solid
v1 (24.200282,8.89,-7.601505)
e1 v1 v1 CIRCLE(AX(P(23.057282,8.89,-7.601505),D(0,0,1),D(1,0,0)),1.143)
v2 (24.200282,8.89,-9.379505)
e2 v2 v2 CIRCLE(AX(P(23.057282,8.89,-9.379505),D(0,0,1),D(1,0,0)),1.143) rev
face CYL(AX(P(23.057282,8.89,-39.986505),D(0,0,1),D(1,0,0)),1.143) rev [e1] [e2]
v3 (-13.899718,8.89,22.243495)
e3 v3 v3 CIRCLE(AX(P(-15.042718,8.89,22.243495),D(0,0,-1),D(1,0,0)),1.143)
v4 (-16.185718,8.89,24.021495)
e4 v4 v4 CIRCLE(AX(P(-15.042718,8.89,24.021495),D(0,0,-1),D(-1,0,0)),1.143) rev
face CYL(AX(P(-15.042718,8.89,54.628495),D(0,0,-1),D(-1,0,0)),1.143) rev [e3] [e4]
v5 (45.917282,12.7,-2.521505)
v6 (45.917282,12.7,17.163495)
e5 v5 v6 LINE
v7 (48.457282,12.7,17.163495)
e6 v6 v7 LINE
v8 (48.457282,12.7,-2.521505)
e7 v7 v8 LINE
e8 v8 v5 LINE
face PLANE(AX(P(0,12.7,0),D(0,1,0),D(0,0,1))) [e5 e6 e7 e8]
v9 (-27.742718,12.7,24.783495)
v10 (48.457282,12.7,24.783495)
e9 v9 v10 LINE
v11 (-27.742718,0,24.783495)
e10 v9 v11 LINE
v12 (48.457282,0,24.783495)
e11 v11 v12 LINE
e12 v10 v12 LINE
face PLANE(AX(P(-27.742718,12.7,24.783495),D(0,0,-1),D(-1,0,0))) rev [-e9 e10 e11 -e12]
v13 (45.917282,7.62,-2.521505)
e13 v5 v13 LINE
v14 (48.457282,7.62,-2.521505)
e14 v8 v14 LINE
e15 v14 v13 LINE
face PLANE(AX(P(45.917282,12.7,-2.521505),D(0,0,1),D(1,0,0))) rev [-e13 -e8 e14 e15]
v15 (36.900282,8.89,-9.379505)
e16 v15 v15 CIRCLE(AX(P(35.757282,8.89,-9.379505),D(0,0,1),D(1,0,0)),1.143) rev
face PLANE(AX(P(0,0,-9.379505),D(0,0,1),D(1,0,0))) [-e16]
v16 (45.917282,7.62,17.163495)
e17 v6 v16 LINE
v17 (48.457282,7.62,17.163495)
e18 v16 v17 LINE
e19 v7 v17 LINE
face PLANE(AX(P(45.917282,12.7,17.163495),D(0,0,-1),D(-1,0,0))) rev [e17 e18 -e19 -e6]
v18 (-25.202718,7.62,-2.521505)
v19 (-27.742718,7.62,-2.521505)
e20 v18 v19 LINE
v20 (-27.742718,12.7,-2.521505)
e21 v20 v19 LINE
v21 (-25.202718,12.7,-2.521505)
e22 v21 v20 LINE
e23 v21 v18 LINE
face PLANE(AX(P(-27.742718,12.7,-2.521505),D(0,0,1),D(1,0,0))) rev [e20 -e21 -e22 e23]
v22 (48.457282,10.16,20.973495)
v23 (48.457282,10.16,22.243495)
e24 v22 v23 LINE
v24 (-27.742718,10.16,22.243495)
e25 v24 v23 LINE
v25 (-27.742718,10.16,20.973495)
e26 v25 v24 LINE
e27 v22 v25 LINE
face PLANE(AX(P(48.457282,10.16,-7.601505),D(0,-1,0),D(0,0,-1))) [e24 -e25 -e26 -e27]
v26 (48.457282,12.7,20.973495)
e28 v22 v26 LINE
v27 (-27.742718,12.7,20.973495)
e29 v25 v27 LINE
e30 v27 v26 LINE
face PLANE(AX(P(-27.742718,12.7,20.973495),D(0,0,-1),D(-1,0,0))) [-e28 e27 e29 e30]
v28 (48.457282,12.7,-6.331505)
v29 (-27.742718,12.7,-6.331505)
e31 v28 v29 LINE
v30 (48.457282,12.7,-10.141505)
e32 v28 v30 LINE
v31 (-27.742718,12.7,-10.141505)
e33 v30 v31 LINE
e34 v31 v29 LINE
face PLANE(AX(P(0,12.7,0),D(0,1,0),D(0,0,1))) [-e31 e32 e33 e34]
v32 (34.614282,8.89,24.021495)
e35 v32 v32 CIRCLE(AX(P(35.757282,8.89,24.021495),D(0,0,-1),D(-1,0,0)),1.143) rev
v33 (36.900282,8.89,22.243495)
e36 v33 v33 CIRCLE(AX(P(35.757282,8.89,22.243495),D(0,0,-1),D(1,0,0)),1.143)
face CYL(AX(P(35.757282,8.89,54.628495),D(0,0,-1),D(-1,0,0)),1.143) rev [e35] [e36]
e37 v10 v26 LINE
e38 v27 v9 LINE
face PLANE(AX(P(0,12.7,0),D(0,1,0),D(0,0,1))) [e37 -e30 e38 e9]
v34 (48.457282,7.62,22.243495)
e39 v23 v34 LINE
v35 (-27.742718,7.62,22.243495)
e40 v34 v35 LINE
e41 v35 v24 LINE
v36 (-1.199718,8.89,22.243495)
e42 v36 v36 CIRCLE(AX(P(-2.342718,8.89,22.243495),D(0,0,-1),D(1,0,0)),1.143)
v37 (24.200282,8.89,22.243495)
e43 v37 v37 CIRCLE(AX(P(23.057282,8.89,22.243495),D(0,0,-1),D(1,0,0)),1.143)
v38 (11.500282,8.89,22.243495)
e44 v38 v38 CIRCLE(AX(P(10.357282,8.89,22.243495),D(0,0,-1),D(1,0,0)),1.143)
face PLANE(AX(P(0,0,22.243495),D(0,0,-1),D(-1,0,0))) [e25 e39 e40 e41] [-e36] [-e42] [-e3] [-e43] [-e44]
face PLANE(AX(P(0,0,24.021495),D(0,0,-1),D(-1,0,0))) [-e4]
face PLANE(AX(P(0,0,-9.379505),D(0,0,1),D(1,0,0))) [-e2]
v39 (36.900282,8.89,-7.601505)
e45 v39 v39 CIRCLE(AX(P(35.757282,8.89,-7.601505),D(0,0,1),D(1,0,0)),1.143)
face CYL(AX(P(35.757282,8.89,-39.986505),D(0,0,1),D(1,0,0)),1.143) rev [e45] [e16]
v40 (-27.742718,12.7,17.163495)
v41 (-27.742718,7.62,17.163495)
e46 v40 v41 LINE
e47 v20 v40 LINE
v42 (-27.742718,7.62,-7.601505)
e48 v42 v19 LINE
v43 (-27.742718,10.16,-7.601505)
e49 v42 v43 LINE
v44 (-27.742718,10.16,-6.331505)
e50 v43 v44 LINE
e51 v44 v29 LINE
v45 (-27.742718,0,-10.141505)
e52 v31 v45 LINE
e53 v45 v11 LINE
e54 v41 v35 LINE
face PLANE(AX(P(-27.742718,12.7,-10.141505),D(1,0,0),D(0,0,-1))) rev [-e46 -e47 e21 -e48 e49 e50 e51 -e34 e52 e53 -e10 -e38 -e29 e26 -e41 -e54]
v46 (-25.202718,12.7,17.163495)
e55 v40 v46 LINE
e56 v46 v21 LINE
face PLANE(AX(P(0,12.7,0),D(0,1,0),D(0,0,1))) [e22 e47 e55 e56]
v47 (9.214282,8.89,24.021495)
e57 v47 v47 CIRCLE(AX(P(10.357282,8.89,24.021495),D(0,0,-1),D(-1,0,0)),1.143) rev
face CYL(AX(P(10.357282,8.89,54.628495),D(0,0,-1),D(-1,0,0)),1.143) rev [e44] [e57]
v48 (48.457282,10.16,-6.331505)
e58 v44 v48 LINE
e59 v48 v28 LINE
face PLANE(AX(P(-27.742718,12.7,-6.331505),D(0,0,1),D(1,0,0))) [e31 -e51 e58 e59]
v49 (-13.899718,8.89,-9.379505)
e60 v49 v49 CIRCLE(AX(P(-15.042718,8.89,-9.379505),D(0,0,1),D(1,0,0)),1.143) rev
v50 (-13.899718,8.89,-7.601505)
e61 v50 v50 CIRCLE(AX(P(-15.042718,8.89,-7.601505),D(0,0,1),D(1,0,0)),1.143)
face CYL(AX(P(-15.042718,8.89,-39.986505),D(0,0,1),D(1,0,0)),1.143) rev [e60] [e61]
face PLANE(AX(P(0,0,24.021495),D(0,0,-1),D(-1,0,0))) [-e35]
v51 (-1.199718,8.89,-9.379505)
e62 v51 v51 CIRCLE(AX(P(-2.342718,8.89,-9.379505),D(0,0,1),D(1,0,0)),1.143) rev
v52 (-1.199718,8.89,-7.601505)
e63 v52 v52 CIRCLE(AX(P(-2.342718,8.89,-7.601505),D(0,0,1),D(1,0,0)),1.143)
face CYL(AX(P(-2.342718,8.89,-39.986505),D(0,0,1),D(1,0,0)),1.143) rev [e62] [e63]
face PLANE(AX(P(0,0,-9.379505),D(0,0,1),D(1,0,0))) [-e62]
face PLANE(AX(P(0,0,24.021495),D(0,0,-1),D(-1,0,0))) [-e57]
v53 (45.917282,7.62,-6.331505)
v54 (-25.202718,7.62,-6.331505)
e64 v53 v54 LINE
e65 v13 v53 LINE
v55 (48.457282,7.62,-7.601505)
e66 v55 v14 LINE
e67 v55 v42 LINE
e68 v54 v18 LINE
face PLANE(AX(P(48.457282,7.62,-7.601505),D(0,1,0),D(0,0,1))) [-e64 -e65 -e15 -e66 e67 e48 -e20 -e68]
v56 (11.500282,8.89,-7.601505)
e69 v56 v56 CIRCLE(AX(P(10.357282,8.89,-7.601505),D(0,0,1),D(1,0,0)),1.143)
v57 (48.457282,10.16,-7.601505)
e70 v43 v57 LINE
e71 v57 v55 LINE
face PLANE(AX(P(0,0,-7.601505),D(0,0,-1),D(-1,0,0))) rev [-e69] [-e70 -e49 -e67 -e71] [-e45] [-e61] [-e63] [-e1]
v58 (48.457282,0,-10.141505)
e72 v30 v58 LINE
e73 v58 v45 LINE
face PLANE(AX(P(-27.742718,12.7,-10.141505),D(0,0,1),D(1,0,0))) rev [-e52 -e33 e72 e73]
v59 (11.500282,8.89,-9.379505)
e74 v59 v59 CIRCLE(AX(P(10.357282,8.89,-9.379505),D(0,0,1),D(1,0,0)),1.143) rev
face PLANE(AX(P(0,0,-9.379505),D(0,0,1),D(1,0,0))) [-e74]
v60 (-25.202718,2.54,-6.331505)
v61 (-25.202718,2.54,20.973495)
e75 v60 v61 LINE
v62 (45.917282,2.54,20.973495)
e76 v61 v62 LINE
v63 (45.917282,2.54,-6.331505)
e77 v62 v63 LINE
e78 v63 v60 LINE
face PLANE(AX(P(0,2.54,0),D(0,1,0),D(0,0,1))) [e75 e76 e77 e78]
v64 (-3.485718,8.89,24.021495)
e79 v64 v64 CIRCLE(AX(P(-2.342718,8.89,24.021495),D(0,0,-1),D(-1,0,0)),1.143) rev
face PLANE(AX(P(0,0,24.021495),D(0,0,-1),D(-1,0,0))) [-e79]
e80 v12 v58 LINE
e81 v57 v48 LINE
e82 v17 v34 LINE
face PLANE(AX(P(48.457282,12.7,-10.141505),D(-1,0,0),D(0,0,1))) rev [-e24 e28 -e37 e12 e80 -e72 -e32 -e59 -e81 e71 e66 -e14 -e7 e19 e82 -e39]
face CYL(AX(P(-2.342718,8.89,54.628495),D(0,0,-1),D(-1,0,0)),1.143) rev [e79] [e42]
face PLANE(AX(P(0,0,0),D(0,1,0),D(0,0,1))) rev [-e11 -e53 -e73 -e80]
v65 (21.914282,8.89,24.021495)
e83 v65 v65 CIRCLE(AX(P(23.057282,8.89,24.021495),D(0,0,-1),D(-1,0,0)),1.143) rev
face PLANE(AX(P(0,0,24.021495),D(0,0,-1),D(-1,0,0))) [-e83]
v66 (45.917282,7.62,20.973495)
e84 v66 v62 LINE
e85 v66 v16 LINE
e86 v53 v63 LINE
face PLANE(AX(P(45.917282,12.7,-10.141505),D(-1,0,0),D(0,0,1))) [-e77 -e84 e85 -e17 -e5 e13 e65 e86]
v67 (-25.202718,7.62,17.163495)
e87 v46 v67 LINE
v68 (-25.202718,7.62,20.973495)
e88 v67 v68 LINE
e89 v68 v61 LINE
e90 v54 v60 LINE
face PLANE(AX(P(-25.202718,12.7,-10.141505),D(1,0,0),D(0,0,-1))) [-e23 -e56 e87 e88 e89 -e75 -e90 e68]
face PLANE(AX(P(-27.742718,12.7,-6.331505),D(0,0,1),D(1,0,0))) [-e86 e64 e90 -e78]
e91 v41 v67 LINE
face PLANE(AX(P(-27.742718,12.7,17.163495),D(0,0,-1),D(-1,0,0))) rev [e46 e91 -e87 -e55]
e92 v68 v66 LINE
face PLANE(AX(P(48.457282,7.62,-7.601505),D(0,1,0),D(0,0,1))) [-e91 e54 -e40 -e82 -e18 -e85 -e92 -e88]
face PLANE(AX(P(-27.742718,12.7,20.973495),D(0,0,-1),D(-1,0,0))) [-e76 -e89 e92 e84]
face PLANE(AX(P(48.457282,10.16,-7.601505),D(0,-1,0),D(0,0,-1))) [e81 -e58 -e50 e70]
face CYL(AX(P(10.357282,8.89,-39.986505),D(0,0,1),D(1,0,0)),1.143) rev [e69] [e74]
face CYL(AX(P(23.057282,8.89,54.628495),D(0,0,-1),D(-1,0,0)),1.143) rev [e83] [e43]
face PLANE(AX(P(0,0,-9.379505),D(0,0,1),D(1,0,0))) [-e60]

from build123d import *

# Parameters (mm, degrees)
SKETCH1_W                 = 76.2
SKETCH1_H                 = 34.925
BOSS_EXTRUDE1_DEPTH       = 12.7
SHELL1_T                  = -2.54
SHELL1_THICKNESS_2_FACE_W = 71.12
SHELL1_THICKNESS_2_FACE_H = 10.16
SHELL1_THICKNESS_2_DEPTH  = 1.27
SHELL1_THICKNESS_3_FACE_W = 71.12
SHELL1_THICKNESS_3_FACE_H = 10.16
SHELL1_THICKNESS_3_DEPTH  = 1.27
CUT_EXTRUDE4_DEPTH        = 28.575
CUT_EXTRUDE4_DEPTH_BACK   = 1.27
SKETCH10_W                = 76.2
SKETCH10_H                = 2.54
SKETCH11_W                = 2.54
SKETCH11_H                = 27.305
CUT_EXTRUDE5_DEPTH        = 2.54
FILL_START                = -10.141504854
FILL_PATTERN1_OUTLINE_R   = 1.143
FILL_PATTERN1_DEPTH       = 2.54
FILL_START_2              = 22.243495146
FILL_PATTERN2_OUTLINE_R   = 1.143
FILL_PATTERN2_DEPTH       = 2.54
SKETCH14_W                = 63.5
SKETCH14_H                = 5.08
BOSS_EXTRUDE2_DEPTH       = 0.762
SKETCH15_W                = 63.5
SKETCH15_H                = 5.08
BOSS_EXTRUDE3_DEPTH       = 0.762
SKETCH17_W                = 2.54
SKETCH17_H                = 19.685
BOSS_EXTRUDE4_DEPTH       = 5.08


# Read off the part's stored shape, not the designer's step: Fill Pattern1, Fill Pattern2
with BuildPart() as part:
    # Sketch1 → Boss-Extrude1 (new body)
    with BuildSketch(Plane(origin=(0, 0, 0), x_dir=(1, 0, 0), z_dir=(0, 1, 0))):
        with Locations((10.357281553, -7.320995146)):
            Rectangle(SKETCH1_W, SKETCH1_H)
    extrude(amount=BOSS_EXTRUDE1_DEPTH)

    # Shell1
    shell1_openings = [part.faces().sort_by_distance(p)[0] for p in [
        (10.357281553, 12.7, 7.320995146),
    ]]
    offset(amount=SHELL1_T, openings=shell1_openings, kind=Kind.INTERSECTION)

    # Shell1 thickness 2 face (on inner face of the shell) → Shell1 thickness 2 (add)
    with BuildSketch(Plane(origin=(10.357281553, 7.62, -7.601504854), x_dir=(-1, 0, 0), z_dir=(0, 0, -1))):
        Rectangle(SHELL1_THICKNESS_2_FACE_W, SHELL1_THICKNESS_2_FACE_H)
    extrude(amount=-SHELL1_THICKNESS_2_DEPTH)

    # Shell1 thickness 3 face (on inner face of the shell) → Shell1 thickness 3 (add)
    with BuildSketch(Plane(origin=(10.357281553, 7.62, 22.243495146), x_dir=(1, 0, 0), z_dir=(0, 0, 1))):
        Rectangle(SHELL1_THICKNESS_3_FACE_W, SHELL1_THICKNESS_3_FACE_H)
    extrude(amount=-SHELL1_THICKNESS_3_DEPTH)

    # Sketch10 → Cut-Extrude4 (cut, two sides: drawn at the far end of the back side and taken through both)
    with BuildSketch(Plane(origin=(0, 0, 20.973495146), x_dir=(-1, 0, 0), z_dir=(0, 0, -1)).offset(-CUT_EXTRUDE4_DEPTH_BACK)):
        with Locations((-10.357281553, 8.89)):
            Rectangle(SKETCH10_W, SKETCH10_H)
    extrude(amount=CUT_EXTRUDE4_DEPTH + CUT_EXTRUDE4_DEPTH_BACK, mode=Mode.SUBTRACT)

    # Sketch11 → Cut-Extrude5 (cut)
    with BuildSketch(Plane(origin=(0, 12.7, 0), x_dir=(1, 0, 0), z_dir=(0, 1, 0))):
        with Locations((-26.472718447, -7.320995146)):
            Rectangle(SKETCH11_W, SKETCH11_H)
        with Locations((47.187281553, -7.320995146)):
            Rectangle(SKETCH11_W, SKETCH11_H)
    extrude(amount=-CUT_EXTRUDE5_DEPTH, mode=Mode.SUBTRACT)

    # Fill Pattern1 outline → Fill Pattern1 (cut)
    with BuildSketch(Plane.XY.offset(FILL_START)):
        with Locations((10.357281553, 8.89)):
            Circle(FILL_PATTERN1_OUTLINE_R)
        with Locations((23.057281553, 8.89)):
            Circle(FILL_PATTERN1_OUTLINE_R)
        with Locations((35.757281553, 8.89)):
            Circle(FILL_PATTERN1_OUTLINE_R)
        with Locations((-2.342718447, 8.89)):
            Circle(FILL_PATTERN1_OUTLINE_R)
        with Locations((-15.042718447, 8.89)):
            Circle(FILL_PATTERN1_OUTLINE_R)
    extrude(amount=FILL_PATTERN1_DEPTH, mode=Mode.SUBTRACT)

    # Fill Pattern2 outline → Fill Pattern2 (cut)
    with BuildSketch(Plane.XY.offset(FILL_START_2)):
        with Locations((10.357281553, 8.89)):
            Circle(FILL_PATTERN2_OUTLINE_R)
        with Locations((23.057281553, 8.89)):
            Circle(FILL_PATTERN2_OUTLINE_R)
        with Locations((35.757281553, 8.89)):
            Circle(FILL_PATTERN2_OUTLINE_R)
        with Locations((-2.342718447, 8.89)):
            Circle(FILL_PATTERN2_OUTLINE_R)
        with Locations((-15.042718447, 8.89)):
            Circle(FILL_PATTERN2_OUTLINE_R)
    extrude(amount=FILL_PATTERN2_DEPTH, mode=Mode.SUBTRACT)

    # Sketch14 → Boss-Extrude2 (add)
    with BuildSketch(Plane.XY.offset(24.783495146)):
        with Locations((10.357281553, 8.89)):
            Rectangle(SKETCH14_W, SKETCH14_H)
    extrude(amount=-BOSS_EXTRUDE2_DEPTH)

    # Sketch15 → Boss-Extrude3 (add)
    with BuildSketch(Plane(origin=(0, 0, -10.141504854), x_dir=(-1, 0, 0), z_dir=(0, 0, -1))):
        with Locations((-10.357281553, 8.89)):
            Rectangle(SKETCH15_W, SKETCH15_H)
    extrude(amount=-BOSS_EXTRUDE3_DEPTH)

    # Sketch17 → Boss-Extrude4 (add)
    with BuildSketch(Plane(origin=(0, 7.62, 0), x_dir=(1, 0, 0), z_dir=(0, 1, 0))):
        with Locations((-26.472718447, -7.320995146)):
            Rectangle(SKETCH17_W, SKETCH17_H)
        with Locations((47.187281553, -7.320995146)):
            Rectangle(SKETCH17_W, SKETCH17_H)
    extrude(amount=BOSS_EXTRUDE4_DEPTH)


solid = part.part
